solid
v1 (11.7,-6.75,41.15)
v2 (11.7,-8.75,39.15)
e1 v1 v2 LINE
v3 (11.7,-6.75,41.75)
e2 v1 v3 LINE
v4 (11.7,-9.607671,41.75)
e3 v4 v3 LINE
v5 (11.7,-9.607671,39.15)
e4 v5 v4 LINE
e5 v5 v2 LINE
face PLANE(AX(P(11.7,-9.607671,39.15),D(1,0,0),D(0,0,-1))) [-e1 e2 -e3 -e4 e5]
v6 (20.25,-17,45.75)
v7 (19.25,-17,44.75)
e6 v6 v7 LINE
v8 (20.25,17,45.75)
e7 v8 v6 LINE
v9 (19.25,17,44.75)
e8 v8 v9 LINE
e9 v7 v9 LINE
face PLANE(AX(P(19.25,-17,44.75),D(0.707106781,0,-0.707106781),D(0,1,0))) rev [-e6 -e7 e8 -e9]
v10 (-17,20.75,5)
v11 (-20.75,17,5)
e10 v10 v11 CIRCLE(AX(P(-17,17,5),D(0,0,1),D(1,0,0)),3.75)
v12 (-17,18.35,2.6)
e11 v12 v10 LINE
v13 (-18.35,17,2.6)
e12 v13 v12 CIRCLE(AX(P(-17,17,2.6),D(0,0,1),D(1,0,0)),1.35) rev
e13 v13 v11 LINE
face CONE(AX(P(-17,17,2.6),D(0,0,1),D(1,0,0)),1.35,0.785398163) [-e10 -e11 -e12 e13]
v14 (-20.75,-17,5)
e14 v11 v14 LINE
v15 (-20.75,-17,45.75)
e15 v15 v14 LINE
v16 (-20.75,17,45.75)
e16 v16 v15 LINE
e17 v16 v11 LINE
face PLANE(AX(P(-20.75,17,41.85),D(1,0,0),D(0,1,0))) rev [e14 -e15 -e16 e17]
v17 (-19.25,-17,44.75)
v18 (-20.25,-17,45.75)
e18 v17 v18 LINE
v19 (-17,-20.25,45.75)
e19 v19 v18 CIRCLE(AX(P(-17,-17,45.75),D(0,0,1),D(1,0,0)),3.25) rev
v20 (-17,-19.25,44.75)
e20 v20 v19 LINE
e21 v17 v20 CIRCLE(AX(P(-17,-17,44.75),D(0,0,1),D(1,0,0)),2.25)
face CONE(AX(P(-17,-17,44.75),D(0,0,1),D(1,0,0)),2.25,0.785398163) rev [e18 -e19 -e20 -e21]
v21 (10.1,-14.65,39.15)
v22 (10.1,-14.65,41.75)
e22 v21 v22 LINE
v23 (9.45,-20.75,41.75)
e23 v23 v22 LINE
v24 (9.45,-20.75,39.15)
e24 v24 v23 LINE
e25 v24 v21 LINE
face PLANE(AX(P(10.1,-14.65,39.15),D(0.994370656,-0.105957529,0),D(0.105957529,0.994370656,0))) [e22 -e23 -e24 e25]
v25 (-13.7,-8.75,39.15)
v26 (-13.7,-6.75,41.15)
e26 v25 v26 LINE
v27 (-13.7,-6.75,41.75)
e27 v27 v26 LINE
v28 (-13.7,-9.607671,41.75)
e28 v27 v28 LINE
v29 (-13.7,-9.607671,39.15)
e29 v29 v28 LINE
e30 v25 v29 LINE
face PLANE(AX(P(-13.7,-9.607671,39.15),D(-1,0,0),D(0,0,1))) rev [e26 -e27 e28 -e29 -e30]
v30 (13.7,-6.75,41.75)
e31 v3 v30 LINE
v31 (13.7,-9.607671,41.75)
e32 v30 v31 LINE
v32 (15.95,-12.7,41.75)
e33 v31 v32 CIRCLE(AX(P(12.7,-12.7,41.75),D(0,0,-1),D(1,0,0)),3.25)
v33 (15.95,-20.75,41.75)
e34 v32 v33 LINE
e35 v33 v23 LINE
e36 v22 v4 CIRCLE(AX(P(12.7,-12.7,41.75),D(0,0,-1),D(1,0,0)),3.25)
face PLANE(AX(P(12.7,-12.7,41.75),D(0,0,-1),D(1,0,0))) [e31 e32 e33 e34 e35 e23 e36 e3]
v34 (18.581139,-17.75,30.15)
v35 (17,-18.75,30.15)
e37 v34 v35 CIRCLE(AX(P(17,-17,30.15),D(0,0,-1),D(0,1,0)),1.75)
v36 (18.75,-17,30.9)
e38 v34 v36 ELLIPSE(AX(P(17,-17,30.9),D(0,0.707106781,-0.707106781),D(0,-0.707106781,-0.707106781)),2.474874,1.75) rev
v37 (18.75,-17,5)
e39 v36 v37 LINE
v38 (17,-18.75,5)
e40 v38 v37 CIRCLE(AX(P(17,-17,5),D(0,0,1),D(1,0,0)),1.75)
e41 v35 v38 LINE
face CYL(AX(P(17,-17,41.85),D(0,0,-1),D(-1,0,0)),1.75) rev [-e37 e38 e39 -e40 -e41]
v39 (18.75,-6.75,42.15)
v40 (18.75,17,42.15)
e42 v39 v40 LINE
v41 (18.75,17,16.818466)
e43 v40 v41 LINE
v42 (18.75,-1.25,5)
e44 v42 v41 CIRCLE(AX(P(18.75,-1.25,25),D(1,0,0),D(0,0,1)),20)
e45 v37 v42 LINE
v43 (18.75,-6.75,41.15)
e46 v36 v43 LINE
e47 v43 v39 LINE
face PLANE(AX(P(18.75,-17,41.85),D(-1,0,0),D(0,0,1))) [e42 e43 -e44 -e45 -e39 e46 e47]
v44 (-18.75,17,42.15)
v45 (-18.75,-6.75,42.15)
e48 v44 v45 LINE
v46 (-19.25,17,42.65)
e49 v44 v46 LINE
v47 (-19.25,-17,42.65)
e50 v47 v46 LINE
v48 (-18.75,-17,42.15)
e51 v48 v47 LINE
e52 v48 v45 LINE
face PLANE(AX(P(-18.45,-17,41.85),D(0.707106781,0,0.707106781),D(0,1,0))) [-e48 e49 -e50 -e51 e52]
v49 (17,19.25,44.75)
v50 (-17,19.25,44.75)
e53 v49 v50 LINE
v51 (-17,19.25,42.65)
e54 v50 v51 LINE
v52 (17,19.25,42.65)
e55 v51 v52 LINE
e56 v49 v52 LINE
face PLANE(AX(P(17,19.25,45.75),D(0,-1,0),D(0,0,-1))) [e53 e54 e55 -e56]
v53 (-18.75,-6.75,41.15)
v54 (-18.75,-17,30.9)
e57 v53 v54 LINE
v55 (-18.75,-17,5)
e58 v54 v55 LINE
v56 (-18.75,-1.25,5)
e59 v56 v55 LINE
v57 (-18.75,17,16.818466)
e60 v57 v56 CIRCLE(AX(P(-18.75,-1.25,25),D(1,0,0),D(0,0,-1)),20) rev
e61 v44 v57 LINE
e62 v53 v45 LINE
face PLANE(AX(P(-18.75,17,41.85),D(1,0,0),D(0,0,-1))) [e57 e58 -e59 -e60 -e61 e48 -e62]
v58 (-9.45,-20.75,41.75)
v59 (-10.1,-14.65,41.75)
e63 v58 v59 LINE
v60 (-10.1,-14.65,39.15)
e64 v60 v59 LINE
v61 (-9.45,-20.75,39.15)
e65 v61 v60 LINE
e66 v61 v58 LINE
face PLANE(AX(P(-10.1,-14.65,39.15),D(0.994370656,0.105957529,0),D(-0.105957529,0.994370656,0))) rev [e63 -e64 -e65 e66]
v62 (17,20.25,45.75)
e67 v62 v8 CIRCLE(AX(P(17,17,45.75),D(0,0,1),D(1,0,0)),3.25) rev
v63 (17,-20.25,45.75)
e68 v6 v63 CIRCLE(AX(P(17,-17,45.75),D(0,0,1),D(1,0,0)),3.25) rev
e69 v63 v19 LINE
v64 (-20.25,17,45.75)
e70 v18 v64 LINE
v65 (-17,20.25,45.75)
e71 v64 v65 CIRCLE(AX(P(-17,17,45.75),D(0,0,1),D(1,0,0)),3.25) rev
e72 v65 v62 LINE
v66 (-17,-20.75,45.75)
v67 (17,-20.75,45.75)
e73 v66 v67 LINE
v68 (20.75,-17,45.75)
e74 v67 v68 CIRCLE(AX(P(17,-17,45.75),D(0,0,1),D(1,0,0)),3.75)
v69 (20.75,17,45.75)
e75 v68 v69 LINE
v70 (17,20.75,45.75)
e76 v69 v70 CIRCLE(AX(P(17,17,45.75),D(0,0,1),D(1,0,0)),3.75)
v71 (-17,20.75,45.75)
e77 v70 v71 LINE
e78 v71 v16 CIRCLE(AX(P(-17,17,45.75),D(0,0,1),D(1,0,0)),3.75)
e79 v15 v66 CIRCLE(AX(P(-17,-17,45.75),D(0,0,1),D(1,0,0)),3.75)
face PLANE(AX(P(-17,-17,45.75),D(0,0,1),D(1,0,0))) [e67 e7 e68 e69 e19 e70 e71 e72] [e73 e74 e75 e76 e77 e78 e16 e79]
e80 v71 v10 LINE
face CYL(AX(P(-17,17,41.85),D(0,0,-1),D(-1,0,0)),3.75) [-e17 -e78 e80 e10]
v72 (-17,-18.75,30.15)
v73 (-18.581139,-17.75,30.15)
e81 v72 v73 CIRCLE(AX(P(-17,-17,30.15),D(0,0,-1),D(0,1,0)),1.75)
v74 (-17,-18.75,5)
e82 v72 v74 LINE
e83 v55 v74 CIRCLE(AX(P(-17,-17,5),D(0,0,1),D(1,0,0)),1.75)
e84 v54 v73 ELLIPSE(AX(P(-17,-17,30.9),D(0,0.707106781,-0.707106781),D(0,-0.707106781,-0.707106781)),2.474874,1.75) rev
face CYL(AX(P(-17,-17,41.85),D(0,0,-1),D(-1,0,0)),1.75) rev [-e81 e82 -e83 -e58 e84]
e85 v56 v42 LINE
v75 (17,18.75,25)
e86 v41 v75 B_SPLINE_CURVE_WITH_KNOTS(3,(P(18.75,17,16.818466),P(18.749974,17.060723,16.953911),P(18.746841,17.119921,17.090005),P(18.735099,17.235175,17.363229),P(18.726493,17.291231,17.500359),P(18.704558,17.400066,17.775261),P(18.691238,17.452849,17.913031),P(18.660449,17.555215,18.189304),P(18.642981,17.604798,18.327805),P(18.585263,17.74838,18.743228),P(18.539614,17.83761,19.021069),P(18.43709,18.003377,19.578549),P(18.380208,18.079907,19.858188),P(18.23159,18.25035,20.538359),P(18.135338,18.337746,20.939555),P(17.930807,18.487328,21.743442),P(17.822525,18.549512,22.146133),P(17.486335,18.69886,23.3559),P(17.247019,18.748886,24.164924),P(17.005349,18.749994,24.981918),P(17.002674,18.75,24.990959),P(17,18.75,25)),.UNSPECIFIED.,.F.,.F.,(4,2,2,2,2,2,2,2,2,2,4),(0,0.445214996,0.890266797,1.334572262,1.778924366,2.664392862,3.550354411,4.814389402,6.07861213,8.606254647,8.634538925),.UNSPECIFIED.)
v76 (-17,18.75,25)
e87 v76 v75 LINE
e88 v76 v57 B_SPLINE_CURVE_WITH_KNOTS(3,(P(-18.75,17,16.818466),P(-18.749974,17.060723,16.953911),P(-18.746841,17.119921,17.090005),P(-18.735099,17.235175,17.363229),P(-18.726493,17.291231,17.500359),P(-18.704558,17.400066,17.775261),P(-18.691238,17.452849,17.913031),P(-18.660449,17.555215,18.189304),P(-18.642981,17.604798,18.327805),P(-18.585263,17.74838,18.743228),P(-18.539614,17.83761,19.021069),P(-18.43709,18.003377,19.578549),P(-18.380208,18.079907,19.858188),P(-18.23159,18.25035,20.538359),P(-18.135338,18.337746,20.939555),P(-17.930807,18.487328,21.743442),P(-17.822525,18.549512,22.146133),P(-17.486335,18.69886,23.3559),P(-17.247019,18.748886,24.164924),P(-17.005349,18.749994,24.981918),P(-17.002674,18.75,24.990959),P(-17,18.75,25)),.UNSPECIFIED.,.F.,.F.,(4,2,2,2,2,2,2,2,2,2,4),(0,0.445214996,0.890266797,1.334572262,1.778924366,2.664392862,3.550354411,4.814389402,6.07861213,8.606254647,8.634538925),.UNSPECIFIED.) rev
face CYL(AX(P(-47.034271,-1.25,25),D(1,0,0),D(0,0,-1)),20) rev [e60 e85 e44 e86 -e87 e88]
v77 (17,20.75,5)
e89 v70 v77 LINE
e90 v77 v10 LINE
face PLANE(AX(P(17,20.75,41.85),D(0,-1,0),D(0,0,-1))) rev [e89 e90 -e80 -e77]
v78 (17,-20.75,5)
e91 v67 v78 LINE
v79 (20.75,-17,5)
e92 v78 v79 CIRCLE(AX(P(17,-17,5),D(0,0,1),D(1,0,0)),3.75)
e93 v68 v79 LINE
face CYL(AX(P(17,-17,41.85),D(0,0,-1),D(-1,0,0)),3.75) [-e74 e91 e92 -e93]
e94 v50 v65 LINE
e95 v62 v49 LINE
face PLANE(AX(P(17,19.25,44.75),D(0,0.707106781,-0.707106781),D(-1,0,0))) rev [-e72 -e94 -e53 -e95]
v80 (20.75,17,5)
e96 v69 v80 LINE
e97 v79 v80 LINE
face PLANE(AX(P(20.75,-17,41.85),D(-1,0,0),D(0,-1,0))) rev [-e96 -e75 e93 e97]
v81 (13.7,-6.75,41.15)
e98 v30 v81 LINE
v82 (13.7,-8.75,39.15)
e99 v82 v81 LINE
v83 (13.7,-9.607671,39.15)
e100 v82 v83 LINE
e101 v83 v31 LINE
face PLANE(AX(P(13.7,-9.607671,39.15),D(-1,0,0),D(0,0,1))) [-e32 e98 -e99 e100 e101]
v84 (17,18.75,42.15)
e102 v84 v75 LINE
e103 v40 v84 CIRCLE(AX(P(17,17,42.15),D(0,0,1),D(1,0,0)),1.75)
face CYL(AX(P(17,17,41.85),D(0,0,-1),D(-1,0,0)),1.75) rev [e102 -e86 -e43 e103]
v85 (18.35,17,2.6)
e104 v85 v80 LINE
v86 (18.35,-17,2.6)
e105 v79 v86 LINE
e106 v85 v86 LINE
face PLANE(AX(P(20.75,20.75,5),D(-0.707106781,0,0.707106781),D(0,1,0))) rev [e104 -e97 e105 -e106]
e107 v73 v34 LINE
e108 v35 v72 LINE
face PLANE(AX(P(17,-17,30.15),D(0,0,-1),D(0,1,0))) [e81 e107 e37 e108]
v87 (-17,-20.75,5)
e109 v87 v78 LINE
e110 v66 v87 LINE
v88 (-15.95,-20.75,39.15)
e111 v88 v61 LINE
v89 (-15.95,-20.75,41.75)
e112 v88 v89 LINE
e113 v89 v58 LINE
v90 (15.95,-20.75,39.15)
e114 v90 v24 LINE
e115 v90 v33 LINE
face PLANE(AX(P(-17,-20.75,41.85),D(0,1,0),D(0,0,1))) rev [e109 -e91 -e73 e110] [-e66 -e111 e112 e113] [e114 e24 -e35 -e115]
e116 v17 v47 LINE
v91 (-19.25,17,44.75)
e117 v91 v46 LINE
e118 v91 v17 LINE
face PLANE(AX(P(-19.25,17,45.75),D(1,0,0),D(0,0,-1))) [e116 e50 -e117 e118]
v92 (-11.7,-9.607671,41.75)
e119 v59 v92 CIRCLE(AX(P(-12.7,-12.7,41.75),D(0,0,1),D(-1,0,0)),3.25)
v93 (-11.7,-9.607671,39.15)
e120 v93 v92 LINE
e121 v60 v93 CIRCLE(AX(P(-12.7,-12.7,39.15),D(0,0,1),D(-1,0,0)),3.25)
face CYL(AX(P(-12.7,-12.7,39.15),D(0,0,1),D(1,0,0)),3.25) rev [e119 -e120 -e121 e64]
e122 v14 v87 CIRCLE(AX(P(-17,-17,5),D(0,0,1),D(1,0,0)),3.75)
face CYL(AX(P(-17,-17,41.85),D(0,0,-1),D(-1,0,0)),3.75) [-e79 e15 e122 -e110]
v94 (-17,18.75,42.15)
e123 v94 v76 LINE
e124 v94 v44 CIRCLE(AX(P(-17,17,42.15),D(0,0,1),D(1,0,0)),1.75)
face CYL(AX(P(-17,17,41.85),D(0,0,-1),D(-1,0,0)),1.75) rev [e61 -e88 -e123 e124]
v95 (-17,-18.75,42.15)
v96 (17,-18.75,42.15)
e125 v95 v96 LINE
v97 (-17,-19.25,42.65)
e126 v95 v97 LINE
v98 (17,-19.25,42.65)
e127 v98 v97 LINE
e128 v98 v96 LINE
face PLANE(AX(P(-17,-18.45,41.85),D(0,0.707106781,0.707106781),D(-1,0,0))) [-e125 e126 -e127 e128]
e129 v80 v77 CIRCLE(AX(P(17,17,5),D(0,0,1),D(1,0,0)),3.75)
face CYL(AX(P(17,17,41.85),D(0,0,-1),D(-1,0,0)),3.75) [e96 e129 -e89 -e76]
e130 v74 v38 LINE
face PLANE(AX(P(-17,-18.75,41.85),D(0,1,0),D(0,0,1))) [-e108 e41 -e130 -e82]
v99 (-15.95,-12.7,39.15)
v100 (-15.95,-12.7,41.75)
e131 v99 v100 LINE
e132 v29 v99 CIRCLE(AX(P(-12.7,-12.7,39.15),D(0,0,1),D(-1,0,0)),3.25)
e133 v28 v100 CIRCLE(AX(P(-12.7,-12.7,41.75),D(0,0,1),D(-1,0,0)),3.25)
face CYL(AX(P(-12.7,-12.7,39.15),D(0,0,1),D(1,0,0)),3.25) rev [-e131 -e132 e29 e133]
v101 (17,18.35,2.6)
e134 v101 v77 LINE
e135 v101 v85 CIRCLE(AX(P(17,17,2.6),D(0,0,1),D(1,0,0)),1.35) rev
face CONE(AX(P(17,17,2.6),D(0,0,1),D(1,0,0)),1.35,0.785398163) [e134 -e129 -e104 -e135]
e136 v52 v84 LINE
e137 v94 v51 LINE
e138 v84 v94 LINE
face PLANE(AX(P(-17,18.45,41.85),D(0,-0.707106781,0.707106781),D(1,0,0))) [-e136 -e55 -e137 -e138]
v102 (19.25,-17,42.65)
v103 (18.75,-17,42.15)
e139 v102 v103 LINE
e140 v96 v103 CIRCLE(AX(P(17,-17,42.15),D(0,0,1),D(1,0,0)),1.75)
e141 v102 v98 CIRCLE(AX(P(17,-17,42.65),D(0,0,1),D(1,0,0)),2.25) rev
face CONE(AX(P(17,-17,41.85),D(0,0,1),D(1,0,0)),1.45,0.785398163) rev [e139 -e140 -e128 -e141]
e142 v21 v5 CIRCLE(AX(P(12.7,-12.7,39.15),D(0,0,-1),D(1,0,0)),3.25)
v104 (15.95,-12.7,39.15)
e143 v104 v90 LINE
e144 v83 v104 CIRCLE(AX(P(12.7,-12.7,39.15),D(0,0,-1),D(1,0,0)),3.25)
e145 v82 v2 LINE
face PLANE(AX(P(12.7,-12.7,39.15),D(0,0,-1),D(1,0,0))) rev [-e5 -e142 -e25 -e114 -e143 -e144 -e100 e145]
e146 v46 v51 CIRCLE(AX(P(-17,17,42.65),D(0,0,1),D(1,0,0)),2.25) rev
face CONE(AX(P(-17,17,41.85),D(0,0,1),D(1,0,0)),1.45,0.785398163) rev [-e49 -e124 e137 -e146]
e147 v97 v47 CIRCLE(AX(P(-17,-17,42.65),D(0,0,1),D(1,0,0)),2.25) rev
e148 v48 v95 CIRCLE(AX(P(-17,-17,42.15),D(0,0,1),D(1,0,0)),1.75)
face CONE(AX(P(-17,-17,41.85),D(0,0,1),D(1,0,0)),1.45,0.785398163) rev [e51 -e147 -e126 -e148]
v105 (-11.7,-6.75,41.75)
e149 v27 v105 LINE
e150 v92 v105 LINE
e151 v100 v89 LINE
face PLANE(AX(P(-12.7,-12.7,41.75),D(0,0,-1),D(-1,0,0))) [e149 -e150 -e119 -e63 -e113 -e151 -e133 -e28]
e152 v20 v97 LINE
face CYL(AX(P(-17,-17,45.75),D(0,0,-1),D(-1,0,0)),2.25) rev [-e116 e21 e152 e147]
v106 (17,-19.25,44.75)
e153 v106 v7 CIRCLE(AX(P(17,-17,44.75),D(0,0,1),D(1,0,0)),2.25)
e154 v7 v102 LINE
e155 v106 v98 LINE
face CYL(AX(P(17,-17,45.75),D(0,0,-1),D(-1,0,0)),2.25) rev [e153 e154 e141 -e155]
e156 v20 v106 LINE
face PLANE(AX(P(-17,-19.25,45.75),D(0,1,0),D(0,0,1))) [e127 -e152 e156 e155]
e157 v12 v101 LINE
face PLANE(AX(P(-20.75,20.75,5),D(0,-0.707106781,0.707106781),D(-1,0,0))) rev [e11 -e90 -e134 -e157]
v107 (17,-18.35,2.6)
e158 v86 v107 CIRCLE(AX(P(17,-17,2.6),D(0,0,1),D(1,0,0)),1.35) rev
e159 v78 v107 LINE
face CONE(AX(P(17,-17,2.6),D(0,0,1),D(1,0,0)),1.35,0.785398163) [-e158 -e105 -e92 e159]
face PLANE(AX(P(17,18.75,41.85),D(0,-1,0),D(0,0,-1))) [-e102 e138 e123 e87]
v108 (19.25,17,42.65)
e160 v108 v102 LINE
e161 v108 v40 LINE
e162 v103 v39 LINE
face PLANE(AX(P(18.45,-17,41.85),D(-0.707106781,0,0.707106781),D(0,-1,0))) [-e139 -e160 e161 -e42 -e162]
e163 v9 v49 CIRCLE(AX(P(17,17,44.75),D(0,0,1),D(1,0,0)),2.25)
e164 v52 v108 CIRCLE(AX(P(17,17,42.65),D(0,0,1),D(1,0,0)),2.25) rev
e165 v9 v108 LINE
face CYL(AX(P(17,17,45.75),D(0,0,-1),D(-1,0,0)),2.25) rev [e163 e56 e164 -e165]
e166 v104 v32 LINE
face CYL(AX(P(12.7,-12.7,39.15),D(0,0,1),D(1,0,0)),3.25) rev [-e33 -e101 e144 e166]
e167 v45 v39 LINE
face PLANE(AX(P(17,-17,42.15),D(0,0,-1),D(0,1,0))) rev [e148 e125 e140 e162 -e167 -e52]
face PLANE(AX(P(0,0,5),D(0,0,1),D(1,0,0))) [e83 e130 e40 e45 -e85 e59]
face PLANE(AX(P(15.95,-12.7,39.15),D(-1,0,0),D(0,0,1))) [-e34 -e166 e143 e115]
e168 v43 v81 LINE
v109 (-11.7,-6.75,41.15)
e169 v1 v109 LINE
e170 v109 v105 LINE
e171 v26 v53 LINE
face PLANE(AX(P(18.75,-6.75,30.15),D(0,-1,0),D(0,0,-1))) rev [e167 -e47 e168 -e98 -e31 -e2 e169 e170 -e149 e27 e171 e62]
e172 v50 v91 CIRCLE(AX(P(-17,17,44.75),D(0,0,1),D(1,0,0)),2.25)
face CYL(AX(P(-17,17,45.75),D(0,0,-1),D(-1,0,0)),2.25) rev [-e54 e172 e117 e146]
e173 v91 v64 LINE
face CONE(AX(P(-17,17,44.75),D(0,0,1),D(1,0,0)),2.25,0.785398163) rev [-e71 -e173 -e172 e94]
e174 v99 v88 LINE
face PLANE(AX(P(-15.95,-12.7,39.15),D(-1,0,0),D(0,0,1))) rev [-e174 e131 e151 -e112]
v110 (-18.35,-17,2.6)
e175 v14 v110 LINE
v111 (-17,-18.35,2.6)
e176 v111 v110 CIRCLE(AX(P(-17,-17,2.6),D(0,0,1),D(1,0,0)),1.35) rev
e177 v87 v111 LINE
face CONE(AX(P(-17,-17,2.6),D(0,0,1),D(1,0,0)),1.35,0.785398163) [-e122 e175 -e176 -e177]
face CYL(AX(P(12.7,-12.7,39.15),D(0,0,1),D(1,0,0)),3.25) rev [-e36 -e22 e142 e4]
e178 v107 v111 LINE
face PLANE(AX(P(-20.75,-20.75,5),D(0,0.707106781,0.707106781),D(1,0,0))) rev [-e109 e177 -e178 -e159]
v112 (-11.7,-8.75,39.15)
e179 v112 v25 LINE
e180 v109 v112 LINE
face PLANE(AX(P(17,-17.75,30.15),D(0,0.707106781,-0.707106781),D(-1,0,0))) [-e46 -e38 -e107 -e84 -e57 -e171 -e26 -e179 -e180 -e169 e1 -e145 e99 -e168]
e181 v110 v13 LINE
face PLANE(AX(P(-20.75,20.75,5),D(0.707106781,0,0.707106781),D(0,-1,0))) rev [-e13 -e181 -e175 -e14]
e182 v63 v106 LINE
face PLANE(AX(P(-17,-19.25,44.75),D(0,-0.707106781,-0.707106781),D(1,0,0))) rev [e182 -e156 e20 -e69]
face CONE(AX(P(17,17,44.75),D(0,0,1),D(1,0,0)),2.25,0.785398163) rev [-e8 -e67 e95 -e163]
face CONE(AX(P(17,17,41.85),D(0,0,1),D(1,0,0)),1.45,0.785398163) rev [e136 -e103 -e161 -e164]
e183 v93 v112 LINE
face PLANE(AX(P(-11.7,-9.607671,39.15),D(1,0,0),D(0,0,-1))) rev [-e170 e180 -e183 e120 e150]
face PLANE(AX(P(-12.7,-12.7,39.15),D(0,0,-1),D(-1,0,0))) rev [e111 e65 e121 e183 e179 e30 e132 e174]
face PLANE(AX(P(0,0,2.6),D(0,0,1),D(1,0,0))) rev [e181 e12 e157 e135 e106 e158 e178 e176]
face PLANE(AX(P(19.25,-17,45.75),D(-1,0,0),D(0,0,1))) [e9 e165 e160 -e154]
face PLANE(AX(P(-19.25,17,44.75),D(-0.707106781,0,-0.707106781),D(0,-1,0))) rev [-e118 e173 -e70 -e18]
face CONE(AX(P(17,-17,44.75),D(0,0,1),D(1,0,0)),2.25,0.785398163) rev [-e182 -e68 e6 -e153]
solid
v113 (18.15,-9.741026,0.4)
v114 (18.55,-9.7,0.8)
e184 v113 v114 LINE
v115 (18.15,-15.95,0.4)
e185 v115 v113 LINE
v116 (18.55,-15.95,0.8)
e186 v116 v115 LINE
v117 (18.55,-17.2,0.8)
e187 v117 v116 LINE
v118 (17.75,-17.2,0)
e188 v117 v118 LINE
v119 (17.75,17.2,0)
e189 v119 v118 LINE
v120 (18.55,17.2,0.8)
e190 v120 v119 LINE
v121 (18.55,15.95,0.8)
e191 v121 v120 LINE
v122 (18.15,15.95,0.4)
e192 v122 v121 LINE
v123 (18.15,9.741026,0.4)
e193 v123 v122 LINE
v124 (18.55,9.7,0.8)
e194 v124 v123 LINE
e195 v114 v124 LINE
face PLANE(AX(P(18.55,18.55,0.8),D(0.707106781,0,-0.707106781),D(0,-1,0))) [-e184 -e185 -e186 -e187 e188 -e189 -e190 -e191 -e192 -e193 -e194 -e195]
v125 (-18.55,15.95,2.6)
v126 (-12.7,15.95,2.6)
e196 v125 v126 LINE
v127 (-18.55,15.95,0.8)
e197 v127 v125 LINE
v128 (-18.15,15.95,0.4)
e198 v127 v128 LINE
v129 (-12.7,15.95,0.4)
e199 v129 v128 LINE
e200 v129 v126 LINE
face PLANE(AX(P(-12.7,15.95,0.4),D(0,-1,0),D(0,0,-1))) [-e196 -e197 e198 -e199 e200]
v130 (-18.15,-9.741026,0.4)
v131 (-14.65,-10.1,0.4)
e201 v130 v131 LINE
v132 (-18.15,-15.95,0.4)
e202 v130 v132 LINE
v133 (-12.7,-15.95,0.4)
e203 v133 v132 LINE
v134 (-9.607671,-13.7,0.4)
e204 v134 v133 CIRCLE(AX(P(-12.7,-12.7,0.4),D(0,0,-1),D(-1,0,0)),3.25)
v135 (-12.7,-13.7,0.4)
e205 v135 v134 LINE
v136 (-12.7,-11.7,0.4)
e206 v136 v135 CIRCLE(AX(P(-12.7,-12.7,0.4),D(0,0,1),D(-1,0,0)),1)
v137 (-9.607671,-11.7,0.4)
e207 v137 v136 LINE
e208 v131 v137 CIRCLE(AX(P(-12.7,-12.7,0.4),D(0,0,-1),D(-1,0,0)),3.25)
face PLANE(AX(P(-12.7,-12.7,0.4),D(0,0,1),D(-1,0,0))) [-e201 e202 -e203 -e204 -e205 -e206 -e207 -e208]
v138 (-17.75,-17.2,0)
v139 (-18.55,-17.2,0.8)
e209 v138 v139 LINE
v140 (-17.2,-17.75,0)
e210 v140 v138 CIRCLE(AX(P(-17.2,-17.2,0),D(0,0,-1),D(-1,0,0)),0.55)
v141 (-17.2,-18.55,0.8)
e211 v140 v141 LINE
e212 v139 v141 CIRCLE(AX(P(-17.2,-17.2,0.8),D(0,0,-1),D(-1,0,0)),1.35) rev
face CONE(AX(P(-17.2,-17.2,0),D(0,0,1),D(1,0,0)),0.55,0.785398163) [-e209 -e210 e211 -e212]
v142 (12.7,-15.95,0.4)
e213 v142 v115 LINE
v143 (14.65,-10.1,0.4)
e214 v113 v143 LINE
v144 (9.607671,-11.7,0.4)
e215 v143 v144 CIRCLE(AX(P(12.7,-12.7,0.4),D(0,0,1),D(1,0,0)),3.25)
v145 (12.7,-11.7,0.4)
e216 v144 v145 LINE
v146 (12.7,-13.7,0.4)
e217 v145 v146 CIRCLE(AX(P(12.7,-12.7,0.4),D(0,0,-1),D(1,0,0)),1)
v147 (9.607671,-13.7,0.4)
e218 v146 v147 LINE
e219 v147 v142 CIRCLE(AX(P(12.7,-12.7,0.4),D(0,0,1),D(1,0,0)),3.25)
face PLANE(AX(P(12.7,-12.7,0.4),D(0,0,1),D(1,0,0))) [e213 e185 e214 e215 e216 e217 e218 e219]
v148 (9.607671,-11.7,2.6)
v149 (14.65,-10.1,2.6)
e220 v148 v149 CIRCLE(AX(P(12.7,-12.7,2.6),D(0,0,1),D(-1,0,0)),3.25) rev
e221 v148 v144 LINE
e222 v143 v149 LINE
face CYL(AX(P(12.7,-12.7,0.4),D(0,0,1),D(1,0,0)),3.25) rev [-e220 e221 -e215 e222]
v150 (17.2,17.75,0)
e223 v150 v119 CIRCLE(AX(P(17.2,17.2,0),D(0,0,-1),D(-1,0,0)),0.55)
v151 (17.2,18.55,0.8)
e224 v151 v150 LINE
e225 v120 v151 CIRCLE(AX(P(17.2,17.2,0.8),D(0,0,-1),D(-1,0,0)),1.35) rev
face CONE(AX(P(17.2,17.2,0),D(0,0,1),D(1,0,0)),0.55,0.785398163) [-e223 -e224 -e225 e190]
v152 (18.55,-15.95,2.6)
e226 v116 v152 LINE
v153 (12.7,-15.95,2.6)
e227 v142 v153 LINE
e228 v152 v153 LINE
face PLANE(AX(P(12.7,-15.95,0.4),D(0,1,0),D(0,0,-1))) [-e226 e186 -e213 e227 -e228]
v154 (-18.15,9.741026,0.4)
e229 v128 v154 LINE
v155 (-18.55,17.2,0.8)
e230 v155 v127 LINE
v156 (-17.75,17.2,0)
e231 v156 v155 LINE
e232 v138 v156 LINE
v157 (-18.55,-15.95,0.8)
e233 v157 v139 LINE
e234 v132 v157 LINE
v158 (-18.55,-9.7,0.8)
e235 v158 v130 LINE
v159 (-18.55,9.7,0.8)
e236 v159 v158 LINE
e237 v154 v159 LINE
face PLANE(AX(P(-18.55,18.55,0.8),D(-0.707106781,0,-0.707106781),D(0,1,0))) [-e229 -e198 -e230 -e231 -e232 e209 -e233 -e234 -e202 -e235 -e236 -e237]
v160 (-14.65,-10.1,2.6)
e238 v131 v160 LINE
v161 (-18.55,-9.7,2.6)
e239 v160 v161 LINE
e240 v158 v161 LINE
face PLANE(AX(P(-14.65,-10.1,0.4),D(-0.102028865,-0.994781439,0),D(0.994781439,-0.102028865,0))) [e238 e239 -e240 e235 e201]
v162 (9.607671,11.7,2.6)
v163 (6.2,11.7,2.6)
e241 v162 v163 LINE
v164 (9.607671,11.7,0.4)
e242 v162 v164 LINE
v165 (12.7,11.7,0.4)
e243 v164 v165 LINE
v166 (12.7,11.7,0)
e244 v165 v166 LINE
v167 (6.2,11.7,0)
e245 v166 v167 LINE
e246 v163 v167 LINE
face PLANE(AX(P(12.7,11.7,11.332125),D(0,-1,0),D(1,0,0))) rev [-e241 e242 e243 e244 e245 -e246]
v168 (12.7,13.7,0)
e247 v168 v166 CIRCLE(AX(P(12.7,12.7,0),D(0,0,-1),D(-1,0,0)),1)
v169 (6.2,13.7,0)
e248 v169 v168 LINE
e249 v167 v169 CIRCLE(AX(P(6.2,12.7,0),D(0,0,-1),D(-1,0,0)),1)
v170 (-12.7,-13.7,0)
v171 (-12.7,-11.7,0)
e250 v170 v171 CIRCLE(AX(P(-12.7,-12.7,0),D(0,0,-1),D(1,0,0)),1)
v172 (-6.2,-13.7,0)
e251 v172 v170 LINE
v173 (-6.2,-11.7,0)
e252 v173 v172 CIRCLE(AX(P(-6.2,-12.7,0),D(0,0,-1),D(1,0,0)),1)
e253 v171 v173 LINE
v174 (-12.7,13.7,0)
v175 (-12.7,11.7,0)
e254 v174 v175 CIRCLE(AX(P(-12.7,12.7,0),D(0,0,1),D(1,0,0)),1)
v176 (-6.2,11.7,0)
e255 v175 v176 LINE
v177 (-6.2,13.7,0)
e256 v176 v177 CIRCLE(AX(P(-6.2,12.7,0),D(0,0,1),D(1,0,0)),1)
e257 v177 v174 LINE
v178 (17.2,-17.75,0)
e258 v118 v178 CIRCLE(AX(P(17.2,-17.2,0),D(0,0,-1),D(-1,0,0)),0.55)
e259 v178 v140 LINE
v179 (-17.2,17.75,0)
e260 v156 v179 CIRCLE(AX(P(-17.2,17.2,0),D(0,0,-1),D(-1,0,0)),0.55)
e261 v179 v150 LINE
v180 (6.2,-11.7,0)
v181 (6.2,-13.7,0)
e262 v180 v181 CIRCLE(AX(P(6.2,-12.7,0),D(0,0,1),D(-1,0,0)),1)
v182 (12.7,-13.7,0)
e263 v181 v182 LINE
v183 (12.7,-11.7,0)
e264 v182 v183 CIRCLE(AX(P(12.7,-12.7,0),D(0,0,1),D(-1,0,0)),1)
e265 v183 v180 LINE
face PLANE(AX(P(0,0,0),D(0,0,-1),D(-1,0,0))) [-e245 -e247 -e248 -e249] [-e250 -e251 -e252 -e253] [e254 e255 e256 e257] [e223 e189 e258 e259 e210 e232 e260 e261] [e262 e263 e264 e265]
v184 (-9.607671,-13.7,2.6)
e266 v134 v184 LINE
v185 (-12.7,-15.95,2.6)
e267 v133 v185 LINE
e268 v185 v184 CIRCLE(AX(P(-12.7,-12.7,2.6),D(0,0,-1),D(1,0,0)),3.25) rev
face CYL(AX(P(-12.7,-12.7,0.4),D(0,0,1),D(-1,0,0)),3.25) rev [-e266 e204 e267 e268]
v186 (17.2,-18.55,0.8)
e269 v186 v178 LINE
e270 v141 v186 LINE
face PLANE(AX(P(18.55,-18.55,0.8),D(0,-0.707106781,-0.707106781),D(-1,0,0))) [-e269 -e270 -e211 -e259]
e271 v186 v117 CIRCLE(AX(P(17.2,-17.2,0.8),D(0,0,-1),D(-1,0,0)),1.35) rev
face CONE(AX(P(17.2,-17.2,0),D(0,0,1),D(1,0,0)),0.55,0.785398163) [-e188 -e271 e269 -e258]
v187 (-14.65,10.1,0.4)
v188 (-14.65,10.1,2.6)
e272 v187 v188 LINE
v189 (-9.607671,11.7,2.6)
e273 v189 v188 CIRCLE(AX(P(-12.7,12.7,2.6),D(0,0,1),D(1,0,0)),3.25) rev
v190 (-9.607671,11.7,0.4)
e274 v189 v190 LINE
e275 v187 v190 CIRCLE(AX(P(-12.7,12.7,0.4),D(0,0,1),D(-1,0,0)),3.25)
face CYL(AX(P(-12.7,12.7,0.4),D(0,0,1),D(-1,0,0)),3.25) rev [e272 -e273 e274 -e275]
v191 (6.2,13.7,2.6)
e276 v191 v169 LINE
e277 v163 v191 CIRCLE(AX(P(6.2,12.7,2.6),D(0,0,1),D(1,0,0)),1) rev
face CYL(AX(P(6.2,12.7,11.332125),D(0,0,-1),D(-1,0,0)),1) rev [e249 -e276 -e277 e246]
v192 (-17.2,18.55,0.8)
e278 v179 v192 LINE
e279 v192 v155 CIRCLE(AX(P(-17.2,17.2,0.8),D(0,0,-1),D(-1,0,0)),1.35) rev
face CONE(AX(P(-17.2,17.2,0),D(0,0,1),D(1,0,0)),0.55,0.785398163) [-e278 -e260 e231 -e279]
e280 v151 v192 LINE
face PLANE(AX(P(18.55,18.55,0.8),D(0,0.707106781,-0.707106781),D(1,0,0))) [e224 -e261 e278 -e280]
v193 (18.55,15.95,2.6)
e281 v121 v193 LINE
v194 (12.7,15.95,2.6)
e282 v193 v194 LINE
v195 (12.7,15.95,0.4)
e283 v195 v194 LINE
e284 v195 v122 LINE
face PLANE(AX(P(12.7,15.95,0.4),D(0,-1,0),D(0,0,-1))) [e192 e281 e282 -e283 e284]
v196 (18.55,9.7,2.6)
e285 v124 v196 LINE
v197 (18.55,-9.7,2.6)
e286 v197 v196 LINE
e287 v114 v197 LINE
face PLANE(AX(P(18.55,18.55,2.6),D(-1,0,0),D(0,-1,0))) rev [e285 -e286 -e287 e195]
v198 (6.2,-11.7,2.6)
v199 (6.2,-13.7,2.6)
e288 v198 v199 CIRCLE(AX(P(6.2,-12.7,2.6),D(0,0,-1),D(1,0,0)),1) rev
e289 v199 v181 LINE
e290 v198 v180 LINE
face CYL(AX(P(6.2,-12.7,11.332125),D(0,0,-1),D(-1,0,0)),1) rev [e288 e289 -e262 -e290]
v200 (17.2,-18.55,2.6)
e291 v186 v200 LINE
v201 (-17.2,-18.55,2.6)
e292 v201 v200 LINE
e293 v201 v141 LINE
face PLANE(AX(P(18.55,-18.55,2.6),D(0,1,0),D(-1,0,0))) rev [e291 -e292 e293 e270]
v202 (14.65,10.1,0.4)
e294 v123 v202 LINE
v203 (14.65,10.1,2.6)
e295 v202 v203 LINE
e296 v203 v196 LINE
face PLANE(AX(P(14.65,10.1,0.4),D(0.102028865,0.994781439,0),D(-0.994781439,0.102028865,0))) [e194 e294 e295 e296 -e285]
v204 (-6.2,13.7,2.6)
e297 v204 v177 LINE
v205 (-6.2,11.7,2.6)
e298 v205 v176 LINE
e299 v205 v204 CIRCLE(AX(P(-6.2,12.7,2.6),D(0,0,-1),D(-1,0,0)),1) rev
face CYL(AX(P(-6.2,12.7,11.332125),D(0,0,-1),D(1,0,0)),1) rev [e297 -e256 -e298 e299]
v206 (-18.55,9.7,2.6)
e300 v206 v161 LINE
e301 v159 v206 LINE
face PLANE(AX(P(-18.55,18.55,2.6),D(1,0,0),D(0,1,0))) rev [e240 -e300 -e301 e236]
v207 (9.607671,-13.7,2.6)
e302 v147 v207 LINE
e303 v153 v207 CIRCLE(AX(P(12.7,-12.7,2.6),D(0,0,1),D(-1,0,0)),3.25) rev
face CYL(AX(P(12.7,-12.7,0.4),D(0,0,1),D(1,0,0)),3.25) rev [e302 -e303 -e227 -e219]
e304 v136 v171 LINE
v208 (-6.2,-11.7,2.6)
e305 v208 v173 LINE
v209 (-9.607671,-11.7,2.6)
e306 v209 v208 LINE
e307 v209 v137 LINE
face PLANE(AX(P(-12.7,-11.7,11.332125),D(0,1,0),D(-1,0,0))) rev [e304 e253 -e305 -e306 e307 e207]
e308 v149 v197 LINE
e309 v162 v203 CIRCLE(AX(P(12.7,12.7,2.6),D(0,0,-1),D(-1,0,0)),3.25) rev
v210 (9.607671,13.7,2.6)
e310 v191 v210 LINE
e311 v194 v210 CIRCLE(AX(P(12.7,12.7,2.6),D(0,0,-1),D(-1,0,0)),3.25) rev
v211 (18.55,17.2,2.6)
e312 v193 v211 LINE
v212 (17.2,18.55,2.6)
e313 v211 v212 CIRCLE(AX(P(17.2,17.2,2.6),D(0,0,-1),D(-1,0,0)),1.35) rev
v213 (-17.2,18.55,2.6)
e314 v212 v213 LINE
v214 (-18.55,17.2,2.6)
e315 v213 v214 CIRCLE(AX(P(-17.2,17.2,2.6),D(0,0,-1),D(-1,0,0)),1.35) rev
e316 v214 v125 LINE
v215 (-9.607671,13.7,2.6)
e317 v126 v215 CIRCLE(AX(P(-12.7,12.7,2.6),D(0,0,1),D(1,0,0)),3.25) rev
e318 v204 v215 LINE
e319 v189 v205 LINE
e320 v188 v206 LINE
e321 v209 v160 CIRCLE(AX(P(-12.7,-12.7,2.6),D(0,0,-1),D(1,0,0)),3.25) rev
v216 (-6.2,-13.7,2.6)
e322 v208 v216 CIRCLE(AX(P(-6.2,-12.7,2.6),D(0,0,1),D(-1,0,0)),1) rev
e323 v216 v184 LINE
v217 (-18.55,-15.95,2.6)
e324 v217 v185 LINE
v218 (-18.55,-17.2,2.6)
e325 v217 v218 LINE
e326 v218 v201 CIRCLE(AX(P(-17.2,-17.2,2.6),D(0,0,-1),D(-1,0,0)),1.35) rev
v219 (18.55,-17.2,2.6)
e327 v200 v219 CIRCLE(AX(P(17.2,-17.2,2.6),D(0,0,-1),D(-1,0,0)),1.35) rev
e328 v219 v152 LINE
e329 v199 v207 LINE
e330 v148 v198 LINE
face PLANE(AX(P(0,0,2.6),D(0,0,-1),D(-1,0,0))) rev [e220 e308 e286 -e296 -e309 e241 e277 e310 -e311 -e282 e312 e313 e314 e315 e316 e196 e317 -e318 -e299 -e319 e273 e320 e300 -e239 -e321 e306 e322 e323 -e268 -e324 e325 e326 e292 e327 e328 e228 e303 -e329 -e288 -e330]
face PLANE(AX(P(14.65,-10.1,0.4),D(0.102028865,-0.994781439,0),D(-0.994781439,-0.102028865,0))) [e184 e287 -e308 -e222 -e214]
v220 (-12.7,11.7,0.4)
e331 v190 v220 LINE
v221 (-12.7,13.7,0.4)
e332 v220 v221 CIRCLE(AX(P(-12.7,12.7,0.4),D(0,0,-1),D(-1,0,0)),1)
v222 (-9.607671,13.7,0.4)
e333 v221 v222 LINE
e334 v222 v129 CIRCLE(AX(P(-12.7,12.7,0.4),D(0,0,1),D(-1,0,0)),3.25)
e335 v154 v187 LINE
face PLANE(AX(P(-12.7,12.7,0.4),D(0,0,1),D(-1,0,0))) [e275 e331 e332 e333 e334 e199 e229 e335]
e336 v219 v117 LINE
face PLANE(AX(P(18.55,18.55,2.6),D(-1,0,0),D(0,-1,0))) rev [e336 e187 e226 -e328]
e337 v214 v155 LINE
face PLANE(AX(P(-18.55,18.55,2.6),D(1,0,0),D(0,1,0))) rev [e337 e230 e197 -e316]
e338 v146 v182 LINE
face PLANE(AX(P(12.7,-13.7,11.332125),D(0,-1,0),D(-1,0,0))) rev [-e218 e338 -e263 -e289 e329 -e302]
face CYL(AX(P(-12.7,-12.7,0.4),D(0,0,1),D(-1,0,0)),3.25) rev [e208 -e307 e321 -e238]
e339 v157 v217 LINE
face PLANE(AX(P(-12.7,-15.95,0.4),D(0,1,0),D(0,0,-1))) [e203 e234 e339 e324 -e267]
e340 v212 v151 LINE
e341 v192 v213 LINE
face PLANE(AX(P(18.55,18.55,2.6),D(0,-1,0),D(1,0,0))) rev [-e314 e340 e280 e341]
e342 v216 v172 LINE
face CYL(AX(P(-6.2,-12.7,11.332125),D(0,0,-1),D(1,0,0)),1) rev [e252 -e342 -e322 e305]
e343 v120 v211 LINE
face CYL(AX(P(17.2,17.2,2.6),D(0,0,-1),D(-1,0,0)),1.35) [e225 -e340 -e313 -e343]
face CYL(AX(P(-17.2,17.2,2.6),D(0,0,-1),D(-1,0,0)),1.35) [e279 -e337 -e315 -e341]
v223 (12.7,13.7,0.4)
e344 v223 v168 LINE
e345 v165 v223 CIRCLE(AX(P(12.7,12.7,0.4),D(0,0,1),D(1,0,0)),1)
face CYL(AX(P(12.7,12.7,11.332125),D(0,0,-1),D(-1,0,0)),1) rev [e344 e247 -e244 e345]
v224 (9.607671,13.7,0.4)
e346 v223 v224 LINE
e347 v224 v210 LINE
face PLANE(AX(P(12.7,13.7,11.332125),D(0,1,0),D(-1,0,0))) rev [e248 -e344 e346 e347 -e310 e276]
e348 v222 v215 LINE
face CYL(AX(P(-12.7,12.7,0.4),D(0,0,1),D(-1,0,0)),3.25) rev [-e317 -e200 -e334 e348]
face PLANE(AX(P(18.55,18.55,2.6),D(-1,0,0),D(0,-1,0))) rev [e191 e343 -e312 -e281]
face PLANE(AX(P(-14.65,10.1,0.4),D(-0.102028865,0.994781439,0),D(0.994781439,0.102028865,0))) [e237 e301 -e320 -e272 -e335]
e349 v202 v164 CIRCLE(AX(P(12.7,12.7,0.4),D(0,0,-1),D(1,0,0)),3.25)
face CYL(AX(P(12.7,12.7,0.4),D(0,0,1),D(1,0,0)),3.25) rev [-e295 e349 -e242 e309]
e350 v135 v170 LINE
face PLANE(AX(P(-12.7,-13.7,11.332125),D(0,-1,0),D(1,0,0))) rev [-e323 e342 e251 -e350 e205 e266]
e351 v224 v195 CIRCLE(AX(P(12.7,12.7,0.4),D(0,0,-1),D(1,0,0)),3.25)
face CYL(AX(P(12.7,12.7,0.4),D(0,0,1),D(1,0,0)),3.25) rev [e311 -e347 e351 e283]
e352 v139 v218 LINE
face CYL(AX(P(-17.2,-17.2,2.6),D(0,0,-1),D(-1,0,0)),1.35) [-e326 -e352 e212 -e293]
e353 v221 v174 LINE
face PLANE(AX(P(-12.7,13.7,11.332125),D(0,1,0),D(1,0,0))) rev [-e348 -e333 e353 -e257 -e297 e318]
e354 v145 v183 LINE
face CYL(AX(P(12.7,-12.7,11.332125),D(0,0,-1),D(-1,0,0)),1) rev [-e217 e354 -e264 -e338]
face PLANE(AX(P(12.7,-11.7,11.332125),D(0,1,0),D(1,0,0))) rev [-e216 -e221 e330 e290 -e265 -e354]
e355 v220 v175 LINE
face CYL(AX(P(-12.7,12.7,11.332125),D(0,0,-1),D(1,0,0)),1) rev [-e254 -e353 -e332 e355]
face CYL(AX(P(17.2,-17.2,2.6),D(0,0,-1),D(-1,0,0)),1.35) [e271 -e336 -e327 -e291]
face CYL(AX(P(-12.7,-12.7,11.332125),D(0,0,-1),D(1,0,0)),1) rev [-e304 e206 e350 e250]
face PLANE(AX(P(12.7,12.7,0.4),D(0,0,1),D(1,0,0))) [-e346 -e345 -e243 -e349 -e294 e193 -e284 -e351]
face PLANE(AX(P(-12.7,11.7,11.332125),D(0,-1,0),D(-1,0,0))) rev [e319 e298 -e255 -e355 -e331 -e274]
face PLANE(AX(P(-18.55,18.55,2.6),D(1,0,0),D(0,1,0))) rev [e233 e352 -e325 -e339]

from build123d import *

# Parameters (mm, degrees)
SKETCH1_W              = 37.1
SKETCH1_H              = 37.1
BOSS_EXTRUDE1_DEPTH    = 2.6
SKETCH2_W              = 41.5
SKETCH2_H              = 41.5
BOSS_EXTRUDE2_DEPTH    = 2.4
BASE_START             = -0.4
BASE_MAGNET_SLOT_DEPTH = 2.6
CUT_EXTRUDE1_START     = -5
CUT_EXTRUDE1_DEPTH     = 5
MIRROR2_START          = -0.4
MIRROR2_COPY_1_DEPTH   = 2.6
MIRROR2_START_2        = -5
MIRROR2_COPY_2_DEPTH   = 5
FILLET1_R              = 1.35
FILLET2_R              = 3.75
CHAMFER1_SIZE          = 0.8
CHAMFER2_SIZE          = 2.4
SIDE_WALLS_DEPTH       = 36.85
BOSS_EXTRUDE4_DEPTH    = 3.9
CHAMFER3_SIZE          = 0.8
CHAMFER4_SIZE          = 1
INTERNAL_RAMP_REACH    = 65.905
BOSS_EXTRUDE6_DEPTH    = 12
CHAMFER5_SIZE          = 11
CUT_EXTRUDE2_DEPTH     = 2.6


# Some blends are built 0.0001 mm under size
with BuildPart() as part:
    # Sketch1 → Boss-Extrude1 (new body)
    with BuildSketch(Plane.XY):
        Rectangle(SKETCH1_W, SKETCH1_H)
    extrude(amount=BOSS_EXTRUDE1_DEPTH)

    # Sketch8 → Base Magnet Slot (cut)
    with BuildSketch(Plane(origin=(0, 0, 2.6), x_dir=(-1, 0, 0), z_dir=(0, 0, -1)).offset(BASE_START)):
        with BuildLine():
            Line((-14.65, 10.1), (-18.55, 9.7))
            Line((-18.55, 9.7), (-18.55, 15.95))
            Line((-18.55, 15.95), (-12.7, 15.95))
            ThreePointArc((-12.7, 15.95), (-9.45, 12.7), (-12.7, 9.45))
            ThreePointArc((-12.7, 9.45), (-13.72774024, 9.616779281), (-14.65, 10.1))
        make_face()
    base_magnet_slot = extrude(amount=BASE_MAGNET_SLOT_DEPTH, mode=Mode.SUBTRACT)

    # Sketch12 → Cut-Extrude1 (cut)
    with BuildSketch(Plane(origin=(0, 0, 0), x_dir=(-1, 0, 0), z_dir=(0, 0, -1)).offset(CUT_EXTRUDE1_START)):
        with BuildLine():
            Line((-12.7, 13.7), (-6.2, 13.7))
            ThreePointArc((-6.2, 13.7), (-5.2, 12.7), (-6.2, 11.7))
            Line((-6.2, 11.7), (-12.7, 11.7))
            ThreePointArc((-12.7, 11.7), (-13.7, 12.7), (-12.7, 13.7))
        make_face()
    cut_extrude1 = extrude(amount=CUT_EXTRUDE1_DEPTH, mode=Mode.SUBTRACT)

    # Mirror1: Base Magnet Slot, Cut-Extrude1 across plane
    add(base_magnet_slot.mirror(Plane.ZX), mode=Mode.SUBTRACT)
    add(cut_extrude1.mirror(Plane.ZX), mode=Mode.SUBTRACT)

    # Mirror2: Base Magnet Slot, Cut-Extrude1 across plane
    add(base_magnet_slot.mirror(Plane(origin=(0, 0, 0), x_dir=(0, 0, 1), z_dir=(1, 0, 0))), mode=Mode.SUBTRACT)
    add(cut_extrude1.mirror(Plane(origin=(0, 0, 0), x_dir=(0, 0, 1), z_dir=(1, 0, 0))), mode=Mode.SUBTRACT)

    # Mirror2 copy 1 sketch → Mirror2 copy 1 (cut)
    with BuildSketch(Plane(origin=(0, 0, 2.6), x_dir=(1, 0, 0), z_dir=(0, 0, -1)).offset(MIRROR2_START)):
        with BuildLine():
            Line((-14.65, 10.1), (-18.55, 9.7))
            Line((-18.55, 9.7), (-18.55, 15.95))
            Line((-18.55, 15.95), (-12.7, 15.95))
            ThreePointArc((-12.7, 15.95), (-9.45, 12.7), (-12.7, 9.45))
            ThreePointArc((-12.7, 9.45), (-13.72774024, 9.616779281), (-14.65, 10.1))
        make_face()
    extrude(amount=MIRROR2_COPY_1_DEPTH, mode=Mode.SUBTRACT)

    # Mirror2 copy 2 sketch → Mirror2 copy 2 (cut)
    with BuildSketch(Plane(origin=(0, 0, 0), x_dir=(1, 0, 0), z_dir=(0, 0, -1)).offset(MIRROR2_START_2)):
        with BuildLine():
            Line((-12.7, 13.7), (-6.2, 13.7))
            ThreePointArc((-6.2, 13.7), (-5.2, 12.7), (-6.2, 11.7))
            Line((-6.2, 11.7), (-12.7, 11.7))
            ThreePointArc((-12.7, 11.7), (-13.7, 12.7), (-12.7, 13.7))
        make_face()
    extrude(amount=MIRROR2_COPY_2_DEPTH, mode=Mode.SUBTRACT)

    # Fillet1
    fillet1_edges = [part.edges().sort_by_distance(p)[0] for p in [
        (-18.55, 18.55, 1.3),
        (18.55, 18.55, 1.3),
        (18.55, -18.55, 1.3),
        (-18.55, -18.55, 1.3),
    ]]
    fillet(fillet1_edges, radius=FILLET1_R)

    # Chamfer1
    # the kernel refuses this chamfer: 0.8 mm, written as the material it takes off along each edge
    with BuildSketch(Plane(origin=(-17.2, 17.2, 0), x_dir=(0, 1, 0), z_dir=(1, 0, 0))) as chamfer1_piece_1:
        Polygon((1.35 - CHAMFER1_SIZE, 0), (1.35, CHAMFER1_SIZE), (1.35, 0), align=None)
    revolve(axis=Axis((-17.2, 17.2, 0), (0, 0, 1)), revolution_arc=90, mode=Mode.SUBTRACT)
    with BuildSketch(Plane(origin=(-18.55, 17.2, 0), x_dir=(0.9996219169112968, 0, -0.027495876610586313), z_dir=(0, -1, 0)), Plane(origin=(-17.2, -18.55, 0), x_dir=(0, 0.9996219169112968, -0.027495876610586313), z_dir=(1, 0, 0)), Plane(origin=(18.55, -17.2, 0), x_dir=(-0.9996219169112968, 0, -0.027495876610586313), z_dir=(0, 1, 0))) as chamfer1_piece_2:
        Polygon((CHAMFER1_SIZE * 0.999621916911, CHAMFER1_SIZE * 0.0274958766106), (-CHAMFER1_SIZE * 0.0274958766106, CHAMFER1_SIZE * 0.999621916911), (0, 0), align=None)
    extrude(amount=34.4, mode=Mode.SUBTRACT)
    with BuildSketch(Plane(origin=(-17.2, -17.2, 0), x_dir=(-1, 0, 0), z_dir=(0, 1, 0))) as chamfer1_piece_3:
        Polygon((1.35 - CHAMFER1_SIZE, 0), (1.35, CHAMFER1_SIZE), (1.35, 0), align=None)
    revolve(axis=Axis((-17.2, -17.2, 0), (0, 0, 1)), revolution_arc=90, mode=Mode.SUBTRACT)
    with BuildSketch(Plane(origin=(17.2, -17.2, 0), x_dir=(1, 0, 0), z_dir=(0, 1, 0))) as chamfer1_piece_4:
        Polygon((1.35 - CHAMFER1_SIZE, 0), (1.35, -CHAMFER1_SIZE), (1.35, 0), align=None)
    revolve(axis=Axis((17.2, -17.2, 0), (0, 0, -1)), revolution_arc=90, mode=Mode.SUBTRACT)
    with BuildSketch(Plane(origin=(17.2, 17.2, 0), x_dir=(0, 1, 0), z_dir=(-1, 0, 0))) as chamfer1_piece_5:
        Polygon((1.35 - CHAMFER1_SIZE, 0), (1.35, -CHAMFER1_SIZE), (1.35, 0), align=None)
    revolve(axis=Axis((17.2, 17.2, 0), (0, 0, -1)), revolution_arc=90, mode=Mode.SUBTRACT)
    with BuildSketch(Plane(origin=(17.2, 18.55, 0), x_dir=(0, 0.02749587661058735, 0.9996219169112966), z_dir=(-1, 0, 0))) as chamfer1_piece_6:
        Polygon((CHAMFER1_SIZE * 0.999621916911, -CHAMFER1_SIZE * 0.0274958766106), (-CHAMFER1_SIZE * 0.0274958766106, -CHAMFER1_SIZE * 0.999621916911), (0, 0), align=None)
    extrude(amount=34.4, mode=Mode.SUBTRACT)


with BuildPart() as body_2:
    # Sketch2 → Boss-Extrude2 (new body)
    with BuildSketch(Plane.XY.offset(2.6)):
        Rectangle(SKETCH2_W, SKETCH2_H)
    extrude(amount=BOSS_EXTRUDE2_DEPTH)

    # Fillet2
    fillet2_edges = [body_2.edges().sort_by_distance(p)[0] for p in [
        (20.75, -20.75, 3.8),
        (-20.75, -20.75, 3.8),
        (-20.75, 20.75, 3.8),
        (20.75, 20.75, 3.8),
    ]]
    fillet(fillet2_edges, radius=FILLET2_R)

    # Chamfer2
    chamfer2_edges = [body_2.edges().sort_by_distance(p)[0] for p in [
        (20.75, 0, 2.6),
        (19.651650429, 19.651650429, 2.6),
        (19.651650429, -19.651650429, 2.6),
        (0, 20.75, 2.6),
        (0, -20.75, 2.6),
        (-19.651650429, 19.651650429, 2.6),
        (-19.651650429, -19.651650429, 2.6),
        (-20.75, 0, 2.6),
    ]]
    chamfer(chamfer2_edges, length=CHAMFER2_SIZE - 0.0001)  # a hair under: the kernel refuses the full size


with BuildPart() as body_3:
    # Sketch5 → Side Walls (new body)
    with BuildSketch(Plane.XY.offset(5)):
        with BuildLine():
            Line((-17, -20.75), (17, -20.75))
            ThreePointArc((17, -20.75), (19.651650429, -19.651650429), (20.75, -17))
            Line((20.75, -17), (20.75, 17))
            ThreePointArc((20.75, 17), (19.651650429, 19.651650429), (17, 20.75))
            Line((17, 20.75), (-17, 20.75))
            ThreePointArc((-17, 20.75), (-19.651650429, 19.651650429), (-20.75, 17))
            Line((-20.75, 17), (-20.75, -17))
            ThreePointArc((-20.75, -17), (-19.651650429, -19.651650429), (-17, -20.75))
        make_face()
        with BuildLine():
            Line((-17, -18.75), (17, -18.75))
            ThreePointArc((17, -18.75), (18.237436867, -18.237436867), (18.75, -17))
            Line((18.75, -17), (18.75, 17))
            ThreePointArc((18.75, 17), (18.237436867, 18.237436867), (17, 18.75))
            Line((17, 18.75), (-17, 18.75))
            ThreePointArc((-17, 18.75), (-18.237436867, 18.237436867), (-18.75, 17))
            Line((-18.75, 17), (-18.75, -17))
            ThreePointArc((-18.75, -17), (-18.237436867, -18.237436867), (-17, -18.75))
        make_face(mode=Mode.SUBTRACT)
    extrude(amount=SIDE_WALLS_DEPTH)

    # Sketch11 → Boss-Extrude4 (add)
    with BuildSketch(Plane.XY.offset(41.85)):
        with BuildLine():
            Line((-17, -20.75), (17, -20.75))
            ThreePointArc((17, -20.75), (19.651650429, -19.651650429), (20.75, -17))
            Line((20.75, -17), (20.75, 17))
            ThreePointArc((20.75, 17), (19.651650429, 19.651650429), (17, 20.75))
            Line((17, 20.75), (-17, 20.75))
            ThreePointArc((-17, 20.75), (-19.651650429, 19.651650429), (-20.75, 17))
            Line((-20.75, 17), (-20.75, -17))
            ThreePointArc((-20.75, -17), (-19.651650429, -19.651650429), (-17, -20.75))
        make_face()
        with BuildLine():
            Line((-17, -19.25), (17, -19.25))
            ThreePointArc((17, -19.25), (18.590990258, -18.590990258), (19.25, -17))
            Line((19.25, -17), (19.25, 17))
            ThreePointArc((19.25, 17), (18.590990258, 18.590990258), (17, 19.25))
            Line((17, 19.25), (-17, 19.25))
            ThreePointArc((-17, 19.25), (-18.590990258, 18.590990258), (-19.25, 17))
            Line((-19.25, 17), (-19.25, -17))
            ThreePointArc((-19.25, -17), (-18.590990258, -18.590990258), (-17, -19.25))
        make_face(mode=Mode.SUBTRACT)
    extrude(amount=BOSS_EXTRUDE4_DEPTH)

    # Chamfer3
    # the kernel refuses this chamfer: 0.8 mm, written as the material it adds along each edge
    with BuildSketch(Plane(origin=(-17, -19.25, 41.85), x_dir=(0, 0.9996219169112966, -0.027495876610587302), z_dir=(1, 0, 0))) as chamfer3_piece_1_section:
        Polygon((CHAMFER3_SIZE * 0.999621916911, CHAMFER3_SIZE * 0.0274958766106), (-CHAMFER3_SIZE * 0.0274958766106, CHAMFER3_SIZE * 0.999621916911), (0, 0), align=None)
    chamfer3_piece_1 = extrude(amount=34, mode=Mode.PRIVATE)
    chamfer3_piece_1 = split(chamfer3_piece_1, bisect_by=Plane(origin=(0, -18.75, 42.146611644), z_dir=(0, -1, 0)), keep=Keep.TOP, mode=Mode.PRIVATE)
    add(chamfer3_piece_1)
    with BuildSketch(Plane(origin=(17, -17, 41.85), x_dir=(0, -1, 0), z_dir=(-1, 0, 0))) as chamfer3_piece_2_section:
        Polygon((2.25 - CHAMFER3_SIZE, 0), (2.25, CHAMFER3_SIZE), (2.25, 0), align=None)
    chamfer3_piece_2 = revolve(axis=Axis((17, -17, 41.85), (0, 0, 1)), revolution_arc=90, mode=Mode.PRIVATE)
    chamfer3_piece_2 = chamfer3_piece_2 - Plane(origin=(17, -17, 42.110756308), x_dir=(0, -1, 0), z_dir=(0, 0, -1)) * Cylinder(1.75, 10, mode=Mode.PRIVATE)
    add(chamfer3_piece_2)
    with BuildSketch(Plane(origin=(-17, -17, 41.85), x_dir=(-1, 0, 0), z_dir=(0, 1, 0))) as chamfer3_piece_3_section:
        Polygon((2.25 - CHAMFER3_SIZE, 0), (2.25, CHAMFER3_SIZE), (2.25, 0), align=None)
    chamfer3_piece_3 = revolve(axis=Axis((-17, -17, 41.85), (0, 0, 1)), revolution_arc=90, mode=Mode.PRIVATE)
    chamfer3_piece_3 = chamfer3_piece_3 - Plane(origin=(-17, -17, 42.110756308), x_dir=(-1, 0, 0), z_dir=(0, 0, -1)) * Cylinder(1.75, 9, mode=Mode.PRIVATE)
    add(chamfer3_piece_3)
    with BuildSketch(Plane(origin=(19.25, -17, 41.85), x_dir=(-0.9996219169112966, 0, -0.027495876610587302), z_dir=(0, 1, 0))) as chamfer3_piece_4_section:
        Polygon((CHAMFER3_SIZE * 0.999621916911, CHAMFER3_SIZE * 0.0274958766106), (-CHAMFER3_SIZE * 0.0274958766106, CHAMFER3_SIZE * 0.999621916911), (0, 0), align=None)
    chamfer3_piece_4 = extrude(amount=34, mode=Mode.PRIVATE)
    chamfer3_piece_4 = split(chamfer3_piece_4, bisect_by=Plane(origin=(18.75, 0, 42.146611644), z_dir=(1, 0, 0)), keep=Keep.TOP, mode=Mode.PRIVATE)
    add(chamfer3_piece_4)
    with BuildSketch(Plane(origin=(-19.25, 17, 41.85), x_dir=(0.9996219169112966, 0, -0.027495876610587302), z_dir=(0, -1, 0))) as chamfer3_piece_5_section:
        Polygon((CHAMFER3_SIZE * 0.999621916911, CHAMFER3_SIZE * 0.0274958766106), (-CHAMFER3_SIZE * 0.0274958766106, CHAMFER3_SIZE * 0.999621916911), (0, 0), align=None)
    chamfer3_piece_5 = extrude(amount=34, mode=Mode.PRIVATE)
    chamfer3_piece_5 = split(chamfer3_piece_5, bisect_by=Plane(origin=(-18.75, 0, 42.146611644), z_dir=(-1, 0, 0)), keep=Keep.TOP, mode=Mode.PRIVATE)
    add(chamfer3_piece_5)
    with BuildSketch(Plane(origin=(17, 17, 41.85), x_dir=(1, 0, 0), z_dir=(0, -1, 0))) as chamfer3_piece_6_section:
        Polygon((2.25 - CHAMFER3_SIZE, 0), (2.25, CHAMFER3_SIZE), (2.25, 0), align=None)
    chamfer3_piece_6 = revolve(axis=Axis((17, 17, 41.85), (0, 0, 1)), revolution_arc=90, mode=Mode.PRIVATE)
    chamfer3_piece_6 = chamfer3_piece_6 - Plane(origin=(17, 17, 42.110756308), x_dir=(1, 0, 0), z_dir=(0, 0, -1)) * Cylinder(1.75, 9, mode=Mode.PRIVATE)
    add(chamfer3_piece_6)
    with BuildSketch(Plane(origin=(-17, 17, 41.85), x_dir=(0, 1, 0), z_dir=(1, 0, 0))) as chamfer3_piece_7_section:
        Polygon((2.25 - CHAMFER3_SIZE, 0), (2.25, CHAMFER3_SIZE), (2.25, 0), align=None)
    chamfer3_piece_7 = revolve(axis=Axis((-17, 17, 41.85), (0, 0, 1)), revolution_arc=90, mode=Mode.PRIVATE)
    chamfer3_piece_7 = chamfer3_piece_7 - Plane(origin=(-17, 17, 42.110756308), x_dir=(0, 1, 0), z_dir=(0, 0, -1)) * Cylinder(1.75, 9, mode=Mode.PRIVATE)
    add(chamfer3_piece_7)
    with BuildSketch(Plane(origin=(17, 19.25, 41.85), x_dir=(0, -0.9996219169112966, -0.027495876610587302), z_dir=(-1, 0, 0))) as chamfer3_piece_8_section:
        Polygon((CHAMFER3_SIZE * 0.999621916911, CHAMFER3_SIZE * 0.0274958766106), (-CHAMFER3_SIZE * 0.0274958766106, CHAMFER3_SIZE * 0.999621916911), (0, 0), align=None)
    chamfer3_piece_8 = extrude(amount=34, mode=Mode.PRIVATE)
    chamfer3_piece_8 = split(chamfer3_piece_8, bisect_by=Plane(origin=(0, 18.75, 42.146611644), z_dir=(0, 1, 0)), keep=Keep.TOP, mode=Mode.PRIVATE)
    add(chamfer3_piece_8)

    # Chamfer4
    chamfer4_edges = [body_3.edges().sort_by_distance(p)[0] for p in [
        (-18.590990258, -18.590990258, 45.75),
        (0, -19.25, 45.75),
        (18.590990258, -18.590990258, 45.75),
        (19.25, 0, 45.75),
        (18.590990258, 18.590990258, 45.75),
        (0, 19.25, 45.75),
        (-18.590990258, 18.590990258, 45.75),
        (-19.25, 0, 45.75),
    ]]
    chamfer(chamfer4_edges, length=CHAMFER4_SIZE)

    # Internal Ramp: up to this face of the body (flat: up to its plane)
    internal_ramp_end = Plane(body_3.part.faces().sort_by_distance((-18.75, 0, 23.575))[0])
    # Sketch13 → Internal Ramp (add, up to the picked face)
    with BuildSketch(Plane.ZY.offset(-18.75), mode=Mode.PRIVATE) as internal_ramp_sk1:
        with BuildLine():
            Line((5, -1.25), (5, 18.75))
            Line((5, 18.75), (25, 18.75))
            ThreePointArc((25, 18.75), (10.857864376, 12.892135624), (5, -1.25))
        make_face()
    internal_ramp_tool1 = split(extrude(internal_ramp_sk1.sketch, amount=INTERNAL_RAMP_REACH, mode=Mode.PRIVATE), bisect_by=internal_ramp_end, keep=Keep.BOTH, mode=Mode.PRIVATE)

    add(body_2.part)  # Internal Ramp merges body 2
    add(internal_ramp_tool1.solids().sort_by(Axis((18.75, 14.282641, 9.467359), (-1, 0, 0)))[0])

    # Sketch14 → Boss-Extrude6 (add)
    with BuildSketch(Plane(origin=(0, 0, 42.15), x_dir=(-1, 0, 0), z_dir=(0, 0, -1))):
        with BuildLine():
            Line((-18.75, -17), (-18.75, -6.75))
            Line((-18.75, -6.75), (18.75, -6.75))
            Line((18.75, -6.75), (18.75, -17))
            ThreePointArc((18.75, -17), (18.237436867, -18.237436867), (17, -18.75))
            Line((17, -18.75), (-17, -18.75))
            ThreePointArc((-17, -18.75), (-18.237436867, -18.237436867), (-18.75, -17))
        make_face()
    extrude(amount=BOSS_EXTRUDE6_DEPTH)

    # Chamfer5
    chamfer5_edges = [body_3.edges().sort_by_distance(p)[0] for p in [
        (0, -6.75, 30.15),
    ]]
    chamfer(chamfer5_edges, length=CHAMFER5_SIZE)

    # Sketch17 → Cut-Extrude2 (cut)
    with BuildSketch(Plane.XY.offset(41.75)):
        with BuildLine():
            Line((-15.95, -12.7), (-15.95, -20.75))
            Line((-15.95, -20.75), (-9.45, -20.75))
            Line((-9.45, -20.75), (-10.1, -14.65))
            ThreePointArc((-10.1, -14.65), (-9.602215148, -11.717030514), (-11.7, -9.607670781))
            Line((-11.7, -9.607670781), (-11.7, -4.7))
            ThreePointArc((-11.7, -4.7), (-12.7, -3.7), (-13.7, -4.7))
            Line((-13.7, -4.7), (-13.7, -9.607670781))
            ThreePointArc((-13.7, -9.607670781), (-15.327974505, -10.787867682), (-15.95, -12.7))
        make_face()
    cut_extrude2 = extrude(amount=-CUT_EXTRUDE2_DEPTH, mode=Mode.SUBTRACT)

    # Mirror3: Cut-Extrude2 across plane
    add(cut_extrude2.mirror(Plane(origin=(0, 0, 0), x_dir=(0, 0, 1), z_dir=(1, 0, 0))), mode=Mode.SUBTRACT)


solid = Compound([part.part, body_3.part])
